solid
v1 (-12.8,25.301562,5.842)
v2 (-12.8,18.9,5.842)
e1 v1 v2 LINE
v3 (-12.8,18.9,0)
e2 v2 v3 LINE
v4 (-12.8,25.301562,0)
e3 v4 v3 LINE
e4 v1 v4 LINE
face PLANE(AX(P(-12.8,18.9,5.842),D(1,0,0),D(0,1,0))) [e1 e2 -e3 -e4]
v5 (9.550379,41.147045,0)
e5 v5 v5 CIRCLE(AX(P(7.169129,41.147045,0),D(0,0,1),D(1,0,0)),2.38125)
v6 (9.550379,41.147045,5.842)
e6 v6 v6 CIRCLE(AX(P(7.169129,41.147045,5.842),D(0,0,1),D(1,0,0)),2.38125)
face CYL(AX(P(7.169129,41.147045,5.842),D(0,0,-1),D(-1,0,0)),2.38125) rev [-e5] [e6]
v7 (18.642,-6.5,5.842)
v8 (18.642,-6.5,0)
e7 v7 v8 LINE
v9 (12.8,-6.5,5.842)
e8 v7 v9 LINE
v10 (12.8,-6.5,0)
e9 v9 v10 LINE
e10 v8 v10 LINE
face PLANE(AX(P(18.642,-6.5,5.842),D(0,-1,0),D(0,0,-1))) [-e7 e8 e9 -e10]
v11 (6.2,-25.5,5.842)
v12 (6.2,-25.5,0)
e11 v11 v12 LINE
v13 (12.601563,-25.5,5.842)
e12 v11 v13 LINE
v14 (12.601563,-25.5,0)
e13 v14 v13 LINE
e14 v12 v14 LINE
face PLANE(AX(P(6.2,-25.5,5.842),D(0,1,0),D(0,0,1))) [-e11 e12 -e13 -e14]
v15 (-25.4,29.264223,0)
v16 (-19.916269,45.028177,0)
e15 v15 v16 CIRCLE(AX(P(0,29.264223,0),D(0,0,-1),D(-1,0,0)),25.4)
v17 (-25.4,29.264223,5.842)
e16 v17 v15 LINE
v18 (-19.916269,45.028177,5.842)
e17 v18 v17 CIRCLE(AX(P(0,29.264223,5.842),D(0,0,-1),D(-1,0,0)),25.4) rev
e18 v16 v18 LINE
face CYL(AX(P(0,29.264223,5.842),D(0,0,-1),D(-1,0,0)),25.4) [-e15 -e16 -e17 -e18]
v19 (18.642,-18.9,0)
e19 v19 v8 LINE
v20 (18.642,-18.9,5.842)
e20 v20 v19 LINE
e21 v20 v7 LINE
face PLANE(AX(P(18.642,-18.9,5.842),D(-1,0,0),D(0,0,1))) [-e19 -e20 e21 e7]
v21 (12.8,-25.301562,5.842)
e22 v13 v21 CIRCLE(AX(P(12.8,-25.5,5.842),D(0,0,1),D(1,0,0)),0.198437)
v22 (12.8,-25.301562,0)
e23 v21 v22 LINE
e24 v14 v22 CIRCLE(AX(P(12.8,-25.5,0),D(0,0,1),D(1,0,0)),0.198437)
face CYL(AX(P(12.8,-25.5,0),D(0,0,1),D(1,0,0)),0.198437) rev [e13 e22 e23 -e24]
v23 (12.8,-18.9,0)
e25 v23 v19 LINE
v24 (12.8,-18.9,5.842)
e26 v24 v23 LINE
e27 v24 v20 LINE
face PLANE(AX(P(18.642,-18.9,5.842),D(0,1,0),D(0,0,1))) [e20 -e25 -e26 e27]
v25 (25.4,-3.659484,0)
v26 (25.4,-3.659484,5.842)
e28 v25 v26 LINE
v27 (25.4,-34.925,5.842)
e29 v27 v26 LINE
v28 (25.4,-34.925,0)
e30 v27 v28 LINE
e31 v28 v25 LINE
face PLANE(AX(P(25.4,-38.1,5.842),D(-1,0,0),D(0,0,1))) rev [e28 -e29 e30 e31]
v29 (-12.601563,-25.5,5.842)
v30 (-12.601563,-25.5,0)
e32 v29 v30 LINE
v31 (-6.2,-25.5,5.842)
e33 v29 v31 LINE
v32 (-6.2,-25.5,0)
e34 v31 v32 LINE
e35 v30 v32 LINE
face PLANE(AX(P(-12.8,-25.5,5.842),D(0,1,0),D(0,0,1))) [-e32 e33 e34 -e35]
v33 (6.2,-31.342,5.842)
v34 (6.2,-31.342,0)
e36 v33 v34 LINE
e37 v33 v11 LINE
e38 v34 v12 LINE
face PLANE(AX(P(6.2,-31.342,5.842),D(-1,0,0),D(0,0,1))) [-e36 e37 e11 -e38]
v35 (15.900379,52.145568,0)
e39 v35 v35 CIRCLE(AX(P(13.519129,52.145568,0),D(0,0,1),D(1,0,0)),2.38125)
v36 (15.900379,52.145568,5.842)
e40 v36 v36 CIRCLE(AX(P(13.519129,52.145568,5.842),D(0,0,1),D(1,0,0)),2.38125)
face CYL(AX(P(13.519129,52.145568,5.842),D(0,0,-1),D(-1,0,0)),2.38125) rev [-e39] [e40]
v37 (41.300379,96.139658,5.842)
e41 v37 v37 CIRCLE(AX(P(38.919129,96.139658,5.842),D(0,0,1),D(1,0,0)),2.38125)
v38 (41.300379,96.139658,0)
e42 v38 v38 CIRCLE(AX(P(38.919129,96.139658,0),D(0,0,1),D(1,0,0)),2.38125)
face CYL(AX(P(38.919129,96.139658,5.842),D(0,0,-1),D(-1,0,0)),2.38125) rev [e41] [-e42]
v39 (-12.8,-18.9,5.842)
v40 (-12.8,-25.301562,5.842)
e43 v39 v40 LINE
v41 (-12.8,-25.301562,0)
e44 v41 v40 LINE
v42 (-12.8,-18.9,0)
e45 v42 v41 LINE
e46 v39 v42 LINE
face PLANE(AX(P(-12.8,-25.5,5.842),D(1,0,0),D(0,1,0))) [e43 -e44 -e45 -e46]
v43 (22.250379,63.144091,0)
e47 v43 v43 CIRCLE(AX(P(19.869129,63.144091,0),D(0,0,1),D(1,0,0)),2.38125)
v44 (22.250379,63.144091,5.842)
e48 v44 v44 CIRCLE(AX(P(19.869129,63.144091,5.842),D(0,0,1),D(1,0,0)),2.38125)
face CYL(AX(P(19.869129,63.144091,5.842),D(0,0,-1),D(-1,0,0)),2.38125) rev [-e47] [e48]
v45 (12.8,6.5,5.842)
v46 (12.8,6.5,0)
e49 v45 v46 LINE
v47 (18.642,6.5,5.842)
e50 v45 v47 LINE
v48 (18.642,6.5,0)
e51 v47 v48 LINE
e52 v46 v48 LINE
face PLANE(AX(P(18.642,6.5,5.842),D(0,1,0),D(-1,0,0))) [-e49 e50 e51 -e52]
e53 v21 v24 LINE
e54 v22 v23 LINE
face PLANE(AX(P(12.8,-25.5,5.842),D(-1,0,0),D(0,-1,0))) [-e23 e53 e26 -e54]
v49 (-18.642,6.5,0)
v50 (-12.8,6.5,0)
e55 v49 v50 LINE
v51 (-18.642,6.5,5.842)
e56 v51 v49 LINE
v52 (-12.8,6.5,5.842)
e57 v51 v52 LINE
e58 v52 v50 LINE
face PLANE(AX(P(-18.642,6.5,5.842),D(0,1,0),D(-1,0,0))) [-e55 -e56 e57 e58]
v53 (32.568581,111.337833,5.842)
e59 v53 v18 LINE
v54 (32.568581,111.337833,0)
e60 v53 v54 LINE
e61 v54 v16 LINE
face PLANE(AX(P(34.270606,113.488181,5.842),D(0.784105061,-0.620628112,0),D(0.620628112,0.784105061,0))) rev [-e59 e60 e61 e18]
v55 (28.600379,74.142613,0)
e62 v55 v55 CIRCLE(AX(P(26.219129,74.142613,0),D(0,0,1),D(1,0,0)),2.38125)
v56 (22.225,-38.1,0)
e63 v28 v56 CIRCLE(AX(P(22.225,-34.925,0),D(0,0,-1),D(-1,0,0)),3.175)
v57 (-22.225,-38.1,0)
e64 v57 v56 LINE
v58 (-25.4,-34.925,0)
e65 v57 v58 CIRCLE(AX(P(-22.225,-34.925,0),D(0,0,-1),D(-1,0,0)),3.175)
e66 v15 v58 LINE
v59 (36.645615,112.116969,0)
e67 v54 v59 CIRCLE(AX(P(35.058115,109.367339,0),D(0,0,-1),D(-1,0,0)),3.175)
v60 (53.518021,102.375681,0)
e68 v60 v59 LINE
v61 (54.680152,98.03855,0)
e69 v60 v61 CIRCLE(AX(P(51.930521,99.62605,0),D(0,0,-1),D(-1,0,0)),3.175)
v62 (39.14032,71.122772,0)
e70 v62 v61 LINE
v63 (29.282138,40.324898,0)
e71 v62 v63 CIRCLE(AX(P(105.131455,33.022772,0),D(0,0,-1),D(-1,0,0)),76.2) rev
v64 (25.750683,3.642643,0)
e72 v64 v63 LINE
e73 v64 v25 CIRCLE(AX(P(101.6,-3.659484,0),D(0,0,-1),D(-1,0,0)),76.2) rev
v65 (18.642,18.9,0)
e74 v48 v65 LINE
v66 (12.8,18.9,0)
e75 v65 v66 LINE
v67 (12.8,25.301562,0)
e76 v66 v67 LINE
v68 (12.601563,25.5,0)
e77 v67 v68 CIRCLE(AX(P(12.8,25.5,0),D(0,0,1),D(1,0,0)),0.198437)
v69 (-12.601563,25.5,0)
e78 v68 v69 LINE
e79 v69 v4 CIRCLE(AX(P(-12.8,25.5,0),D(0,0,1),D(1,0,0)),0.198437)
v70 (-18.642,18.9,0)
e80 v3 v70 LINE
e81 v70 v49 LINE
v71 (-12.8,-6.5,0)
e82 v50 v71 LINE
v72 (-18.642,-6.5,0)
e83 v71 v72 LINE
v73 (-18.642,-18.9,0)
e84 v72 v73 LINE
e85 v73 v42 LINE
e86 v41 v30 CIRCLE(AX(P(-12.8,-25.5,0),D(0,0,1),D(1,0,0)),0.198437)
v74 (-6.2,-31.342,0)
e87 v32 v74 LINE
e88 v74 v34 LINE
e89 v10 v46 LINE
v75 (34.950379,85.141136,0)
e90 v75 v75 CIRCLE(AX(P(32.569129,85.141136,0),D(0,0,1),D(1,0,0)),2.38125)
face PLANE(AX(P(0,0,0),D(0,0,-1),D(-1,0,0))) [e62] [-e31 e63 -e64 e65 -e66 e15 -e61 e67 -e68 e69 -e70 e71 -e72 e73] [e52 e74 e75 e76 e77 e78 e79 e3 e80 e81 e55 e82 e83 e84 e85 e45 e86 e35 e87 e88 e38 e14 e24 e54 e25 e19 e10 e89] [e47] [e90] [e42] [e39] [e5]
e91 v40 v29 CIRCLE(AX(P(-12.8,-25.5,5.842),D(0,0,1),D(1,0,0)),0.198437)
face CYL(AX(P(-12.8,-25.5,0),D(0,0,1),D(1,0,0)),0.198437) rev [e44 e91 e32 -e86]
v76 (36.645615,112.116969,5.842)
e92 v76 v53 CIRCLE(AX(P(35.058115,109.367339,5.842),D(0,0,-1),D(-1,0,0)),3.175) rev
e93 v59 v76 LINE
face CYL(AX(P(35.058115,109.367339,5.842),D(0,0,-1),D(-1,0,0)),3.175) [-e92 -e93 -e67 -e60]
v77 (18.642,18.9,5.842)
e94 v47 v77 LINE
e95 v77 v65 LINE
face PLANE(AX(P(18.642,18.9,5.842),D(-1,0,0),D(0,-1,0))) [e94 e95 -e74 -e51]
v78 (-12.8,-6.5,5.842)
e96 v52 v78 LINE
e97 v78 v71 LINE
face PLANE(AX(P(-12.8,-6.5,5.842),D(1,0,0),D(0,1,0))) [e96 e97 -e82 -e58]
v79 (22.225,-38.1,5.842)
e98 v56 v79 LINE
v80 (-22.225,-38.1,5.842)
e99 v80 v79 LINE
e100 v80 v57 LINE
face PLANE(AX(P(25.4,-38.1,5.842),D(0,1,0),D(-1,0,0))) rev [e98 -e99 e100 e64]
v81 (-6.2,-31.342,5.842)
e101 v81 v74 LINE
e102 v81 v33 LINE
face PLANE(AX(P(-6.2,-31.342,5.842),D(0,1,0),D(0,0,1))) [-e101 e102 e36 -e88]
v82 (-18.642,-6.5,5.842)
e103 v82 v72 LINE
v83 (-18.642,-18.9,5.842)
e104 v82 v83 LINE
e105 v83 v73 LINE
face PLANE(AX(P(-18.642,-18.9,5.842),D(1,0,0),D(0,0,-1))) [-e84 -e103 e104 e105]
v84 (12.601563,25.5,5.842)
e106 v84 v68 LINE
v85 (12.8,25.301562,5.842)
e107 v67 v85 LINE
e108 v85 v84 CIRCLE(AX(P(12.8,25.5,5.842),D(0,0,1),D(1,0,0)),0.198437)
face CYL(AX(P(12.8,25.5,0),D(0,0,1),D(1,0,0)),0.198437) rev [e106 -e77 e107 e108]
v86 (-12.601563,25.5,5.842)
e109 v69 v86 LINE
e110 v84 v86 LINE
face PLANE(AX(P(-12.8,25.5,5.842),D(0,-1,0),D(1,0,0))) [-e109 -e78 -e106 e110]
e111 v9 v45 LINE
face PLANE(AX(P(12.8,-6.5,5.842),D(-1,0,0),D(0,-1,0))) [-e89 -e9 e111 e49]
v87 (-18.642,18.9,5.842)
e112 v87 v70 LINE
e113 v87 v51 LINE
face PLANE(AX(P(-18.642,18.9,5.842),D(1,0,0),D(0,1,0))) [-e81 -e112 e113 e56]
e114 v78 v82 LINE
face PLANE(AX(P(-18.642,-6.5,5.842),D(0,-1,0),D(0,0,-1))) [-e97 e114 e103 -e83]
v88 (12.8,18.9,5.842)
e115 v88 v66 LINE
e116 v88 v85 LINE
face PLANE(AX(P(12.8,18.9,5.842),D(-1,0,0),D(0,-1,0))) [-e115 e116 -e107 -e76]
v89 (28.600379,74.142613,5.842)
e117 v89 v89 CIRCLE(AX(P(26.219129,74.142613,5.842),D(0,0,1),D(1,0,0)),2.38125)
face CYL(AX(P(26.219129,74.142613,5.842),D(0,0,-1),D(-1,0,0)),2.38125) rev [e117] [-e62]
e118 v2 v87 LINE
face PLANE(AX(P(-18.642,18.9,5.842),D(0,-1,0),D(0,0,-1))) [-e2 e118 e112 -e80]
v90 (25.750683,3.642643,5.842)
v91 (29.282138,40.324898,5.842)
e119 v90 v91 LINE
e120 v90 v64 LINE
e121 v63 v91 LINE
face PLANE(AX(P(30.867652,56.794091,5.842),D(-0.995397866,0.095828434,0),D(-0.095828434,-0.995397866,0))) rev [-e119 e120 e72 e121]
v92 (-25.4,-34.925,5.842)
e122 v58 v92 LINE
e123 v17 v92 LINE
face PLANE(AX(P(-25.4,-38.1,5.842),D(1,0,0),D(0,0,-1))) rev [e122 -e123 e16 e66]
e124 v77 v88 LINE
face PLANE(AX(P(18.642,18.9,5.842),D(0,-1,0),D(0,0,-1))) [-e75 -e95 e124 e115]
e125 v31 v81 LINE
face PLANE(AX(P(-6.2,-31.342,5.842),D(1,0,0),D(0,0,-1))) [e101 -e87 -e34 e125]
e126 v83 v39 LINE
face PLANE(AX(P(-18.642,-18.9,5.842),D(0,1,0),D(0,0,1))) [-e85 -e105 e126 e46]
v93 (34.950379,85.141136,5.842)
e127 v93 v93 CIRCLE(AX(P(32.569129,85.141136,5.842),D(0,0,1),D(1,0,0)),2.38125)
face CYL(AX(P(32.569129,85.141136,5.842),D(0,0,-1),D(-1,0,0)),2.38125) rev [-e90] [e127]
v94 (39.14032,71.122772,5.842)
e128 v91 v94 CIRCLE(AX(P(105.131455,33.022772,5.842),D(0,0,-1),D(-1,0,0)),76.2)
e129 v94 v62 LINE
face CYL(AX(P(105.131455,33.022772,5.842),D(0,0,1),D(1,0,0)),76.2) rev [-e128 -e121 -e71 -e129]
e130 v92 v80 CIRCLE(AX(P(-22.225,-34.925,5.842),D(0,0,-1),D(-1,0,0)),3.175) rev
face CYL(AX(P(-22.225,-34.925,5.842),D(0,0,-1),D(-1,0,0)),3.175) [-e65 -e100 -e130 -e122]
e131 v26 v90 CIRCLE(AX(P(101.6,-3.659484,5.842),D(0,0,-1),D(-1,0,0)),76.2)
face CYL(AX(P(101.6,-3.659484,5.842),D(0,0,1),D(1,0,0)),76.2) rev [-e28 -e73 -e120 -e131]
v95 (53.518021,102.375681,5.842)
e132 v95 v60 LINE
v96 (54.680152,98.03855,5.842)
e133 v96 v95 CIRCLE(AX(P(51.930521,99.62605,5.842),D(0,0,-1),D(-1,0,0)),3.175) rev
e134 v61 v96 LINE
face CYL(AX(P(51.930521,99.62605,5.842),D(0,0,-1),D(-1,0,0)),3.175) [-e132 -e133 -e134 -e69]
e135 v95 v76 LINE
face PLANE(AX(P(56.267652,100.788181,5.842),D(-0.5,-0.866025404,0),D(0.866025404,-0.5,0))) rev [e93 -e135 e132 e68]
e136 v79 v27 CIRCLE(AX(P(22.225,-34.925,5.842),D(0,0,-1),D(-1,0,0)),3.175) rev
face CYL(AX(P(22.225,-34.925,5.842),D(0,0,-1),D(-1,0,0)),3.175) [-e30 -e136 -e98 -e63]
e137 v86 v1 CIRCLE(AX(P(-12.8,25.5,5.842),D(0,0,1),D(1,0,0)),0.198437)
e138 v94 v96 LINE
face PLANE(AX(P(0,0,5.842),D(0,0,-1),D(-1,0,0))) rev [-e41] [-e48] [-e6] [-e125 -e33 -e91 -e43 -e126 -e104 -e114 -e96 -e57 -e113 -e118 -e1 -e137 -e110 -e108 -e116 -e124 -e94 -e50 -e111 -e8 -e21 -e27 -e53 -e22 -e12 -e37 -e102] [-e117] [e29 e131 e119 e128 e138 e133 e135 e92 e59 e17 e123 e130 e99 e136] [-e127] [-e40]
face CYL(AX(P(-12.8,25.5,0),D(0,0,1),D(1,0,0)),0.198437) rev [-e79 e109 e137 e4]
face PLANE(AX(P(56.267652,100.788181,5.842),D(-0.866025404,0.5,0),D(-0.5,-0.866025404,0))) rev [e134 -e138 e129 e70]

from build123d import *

# Parameters (mm, degrees)
SKETCH1_R           = 2.38125
BOSS_EXTRUDE1_DEPTH = 5.842
FILLET1_R           = 3.175
FILLET3_R           = 76.2
FILLET4_R           = 25.4
SKETCH2_R           = 0.1984375
CUT_EXTRUDE1_DEPTH  = 126.445308344


with BuildPart() as part:
    # Sketch1 → Boss-Extrude1 (new body)
    with BuildSketch(Plane.XY):
        Polygon((25.4, -38.1), (-25.4, -38.1), (-25.4, 38.1), (34.270606379, 113.488181024), (56.267651635, 100.788181024), (30.867651635, 56.794090512), (25.4, 0), align=None)
        with Locations((7.169129007, 41.147045256)):
            Circle(SKETCH1_R, mode=Mode.SUBTRACT)
        with Locations((13.519129007, 52.145567884)):
            Circle(SKETCH1_R, mode=Mode.SUBTRACT)
        with Locations((19.869129007, 63.144090512)):
            Circle(SKETCH1_R, mode=Mode.SUBTRACT)
        with Locations((26.219129007, 74.14261314)):
            Circle(SKETCH1_R, mode=Mode.SUBTRACT)
        with Locations((32.569129007, 85.141135768)):
            Circle(SKETCH1_R, mode=Mode.SUBTRACT)
        with Locations((38.919129007, 96.139658396)):
            Circle(SKETCH1_R, mode=Mode.SUBTRACT)
        Polygon((-12.800000054, -25.5), (-6.2, -25.5), (-6.2, -31.342), (6.2, -31.342), (6.2, -25.5), (12.800000054, -25.5), (12.800000054, -18.9), (18.642000054, -18.9), (18.642000054, -6.5), (12.800000054, -6.5), (12.800000054, 6.5), (18.642000054, 6.5), (18.642000054, 18.9), (12.800000054, 18.9), (12.800000054, 25.5), (-12.800000054, 25.5), (-12.800000054, 18.9), (-18.642000054, 18.9), (-18.642000054, 6.5), (-12.800000054, 6.5), (-12.800000054, -6.5), (-18.642000054, -6.5), (-18.642000054, -18.9), (-12.800000054, -18.9), align=None, mode=Mode.SUBTRACT)
    extrude(amount=BOSS_EXTRUDE1_DEPTH)

    # Fillet1
    fillet1_edges = [part.edges().sort_by_distance(p)[0] for p in [
        (34.270606379, 113.488181024, 2.921),
        (56.267651635, 100.788181024, 2.921),
        (25.4, -38.1, 2.921),
        (-25.4, -38.1, 2.921),
    ]]
    fillet(fillet1_edges, radius=FILLET1_R)

    # Fillet3
    # the kernel refuses this fillet: 76.2 mm, written as the material it adds along each edge
    with BuildSketch(Plane(origin=(30.867651635, 56.794090512, 0), x_dir=(-0.09582843425224026, -0.9953978657746682, 0), z_dir=(0, 0, 1))) as fillet3_piece_1:
        with BuildLine():
            CenterArc((FILLET3_R * 0.217130392833, FILLET3_R), FILLET3_R, 245.499003148, 24.500996852)
            Line((-FILLET3_R * 0.197578681587, FILLET3_R * 0.0900459442402), (0, 0))
            Line((0, 0), (FILLET3_R * 0.217130392833, 0))
        make_face()
    extrude(amount=5.842)
    with BuildSketch(Plane(origin=(25.4, 0, 0), x_dir=(0, -1, 0), z_dir=(0, 0, 1))) as fillet3_piece_2:
        with BuildLine():
            CenterArc((FILLET3_R * 0.048024725242, FILLET3_R), FILLET3_R, 264.500996852, 5.499003148)
            Line((-FILLET3_R * 0.0478037090103, FILLET3_R * 0.00460213422533), (0, 0))
            Line((0, 0), (FILLET3_R * 0.048024725242, 0))
        make_face()
    extrude(amount=5.842)

    # Fillet4
    fillet4_edges = [part.edges().sort_by_distance(p)[0] for p in [
        (-25.4, 38.1, 2.921),
    ]]
    fillet(fillet4_edges, radius=FILLET4_R)

    # Sketch2 → Cut-Extrude1 (cut, through all)
    with BuildSketch(Plane.XY.offset(5.842)):
        with Locations((-12.800000054, 25.5)):
            Circle(SKETCH2_R)
        with Locations((12.800000054, 25.5)):
            Circle(SKETCH2_R)
        with Locations((12.800000054, -25.5)):
            Circle(SKETCH2_R)
        with Locations((-12.800000054, -25.5)):
            Circle(SKETCH2_R)
    extrude(amount=-CUT_EXTRUDE1_DEPTH, mode=Mode.SUBTRACT)


solid = part.part
